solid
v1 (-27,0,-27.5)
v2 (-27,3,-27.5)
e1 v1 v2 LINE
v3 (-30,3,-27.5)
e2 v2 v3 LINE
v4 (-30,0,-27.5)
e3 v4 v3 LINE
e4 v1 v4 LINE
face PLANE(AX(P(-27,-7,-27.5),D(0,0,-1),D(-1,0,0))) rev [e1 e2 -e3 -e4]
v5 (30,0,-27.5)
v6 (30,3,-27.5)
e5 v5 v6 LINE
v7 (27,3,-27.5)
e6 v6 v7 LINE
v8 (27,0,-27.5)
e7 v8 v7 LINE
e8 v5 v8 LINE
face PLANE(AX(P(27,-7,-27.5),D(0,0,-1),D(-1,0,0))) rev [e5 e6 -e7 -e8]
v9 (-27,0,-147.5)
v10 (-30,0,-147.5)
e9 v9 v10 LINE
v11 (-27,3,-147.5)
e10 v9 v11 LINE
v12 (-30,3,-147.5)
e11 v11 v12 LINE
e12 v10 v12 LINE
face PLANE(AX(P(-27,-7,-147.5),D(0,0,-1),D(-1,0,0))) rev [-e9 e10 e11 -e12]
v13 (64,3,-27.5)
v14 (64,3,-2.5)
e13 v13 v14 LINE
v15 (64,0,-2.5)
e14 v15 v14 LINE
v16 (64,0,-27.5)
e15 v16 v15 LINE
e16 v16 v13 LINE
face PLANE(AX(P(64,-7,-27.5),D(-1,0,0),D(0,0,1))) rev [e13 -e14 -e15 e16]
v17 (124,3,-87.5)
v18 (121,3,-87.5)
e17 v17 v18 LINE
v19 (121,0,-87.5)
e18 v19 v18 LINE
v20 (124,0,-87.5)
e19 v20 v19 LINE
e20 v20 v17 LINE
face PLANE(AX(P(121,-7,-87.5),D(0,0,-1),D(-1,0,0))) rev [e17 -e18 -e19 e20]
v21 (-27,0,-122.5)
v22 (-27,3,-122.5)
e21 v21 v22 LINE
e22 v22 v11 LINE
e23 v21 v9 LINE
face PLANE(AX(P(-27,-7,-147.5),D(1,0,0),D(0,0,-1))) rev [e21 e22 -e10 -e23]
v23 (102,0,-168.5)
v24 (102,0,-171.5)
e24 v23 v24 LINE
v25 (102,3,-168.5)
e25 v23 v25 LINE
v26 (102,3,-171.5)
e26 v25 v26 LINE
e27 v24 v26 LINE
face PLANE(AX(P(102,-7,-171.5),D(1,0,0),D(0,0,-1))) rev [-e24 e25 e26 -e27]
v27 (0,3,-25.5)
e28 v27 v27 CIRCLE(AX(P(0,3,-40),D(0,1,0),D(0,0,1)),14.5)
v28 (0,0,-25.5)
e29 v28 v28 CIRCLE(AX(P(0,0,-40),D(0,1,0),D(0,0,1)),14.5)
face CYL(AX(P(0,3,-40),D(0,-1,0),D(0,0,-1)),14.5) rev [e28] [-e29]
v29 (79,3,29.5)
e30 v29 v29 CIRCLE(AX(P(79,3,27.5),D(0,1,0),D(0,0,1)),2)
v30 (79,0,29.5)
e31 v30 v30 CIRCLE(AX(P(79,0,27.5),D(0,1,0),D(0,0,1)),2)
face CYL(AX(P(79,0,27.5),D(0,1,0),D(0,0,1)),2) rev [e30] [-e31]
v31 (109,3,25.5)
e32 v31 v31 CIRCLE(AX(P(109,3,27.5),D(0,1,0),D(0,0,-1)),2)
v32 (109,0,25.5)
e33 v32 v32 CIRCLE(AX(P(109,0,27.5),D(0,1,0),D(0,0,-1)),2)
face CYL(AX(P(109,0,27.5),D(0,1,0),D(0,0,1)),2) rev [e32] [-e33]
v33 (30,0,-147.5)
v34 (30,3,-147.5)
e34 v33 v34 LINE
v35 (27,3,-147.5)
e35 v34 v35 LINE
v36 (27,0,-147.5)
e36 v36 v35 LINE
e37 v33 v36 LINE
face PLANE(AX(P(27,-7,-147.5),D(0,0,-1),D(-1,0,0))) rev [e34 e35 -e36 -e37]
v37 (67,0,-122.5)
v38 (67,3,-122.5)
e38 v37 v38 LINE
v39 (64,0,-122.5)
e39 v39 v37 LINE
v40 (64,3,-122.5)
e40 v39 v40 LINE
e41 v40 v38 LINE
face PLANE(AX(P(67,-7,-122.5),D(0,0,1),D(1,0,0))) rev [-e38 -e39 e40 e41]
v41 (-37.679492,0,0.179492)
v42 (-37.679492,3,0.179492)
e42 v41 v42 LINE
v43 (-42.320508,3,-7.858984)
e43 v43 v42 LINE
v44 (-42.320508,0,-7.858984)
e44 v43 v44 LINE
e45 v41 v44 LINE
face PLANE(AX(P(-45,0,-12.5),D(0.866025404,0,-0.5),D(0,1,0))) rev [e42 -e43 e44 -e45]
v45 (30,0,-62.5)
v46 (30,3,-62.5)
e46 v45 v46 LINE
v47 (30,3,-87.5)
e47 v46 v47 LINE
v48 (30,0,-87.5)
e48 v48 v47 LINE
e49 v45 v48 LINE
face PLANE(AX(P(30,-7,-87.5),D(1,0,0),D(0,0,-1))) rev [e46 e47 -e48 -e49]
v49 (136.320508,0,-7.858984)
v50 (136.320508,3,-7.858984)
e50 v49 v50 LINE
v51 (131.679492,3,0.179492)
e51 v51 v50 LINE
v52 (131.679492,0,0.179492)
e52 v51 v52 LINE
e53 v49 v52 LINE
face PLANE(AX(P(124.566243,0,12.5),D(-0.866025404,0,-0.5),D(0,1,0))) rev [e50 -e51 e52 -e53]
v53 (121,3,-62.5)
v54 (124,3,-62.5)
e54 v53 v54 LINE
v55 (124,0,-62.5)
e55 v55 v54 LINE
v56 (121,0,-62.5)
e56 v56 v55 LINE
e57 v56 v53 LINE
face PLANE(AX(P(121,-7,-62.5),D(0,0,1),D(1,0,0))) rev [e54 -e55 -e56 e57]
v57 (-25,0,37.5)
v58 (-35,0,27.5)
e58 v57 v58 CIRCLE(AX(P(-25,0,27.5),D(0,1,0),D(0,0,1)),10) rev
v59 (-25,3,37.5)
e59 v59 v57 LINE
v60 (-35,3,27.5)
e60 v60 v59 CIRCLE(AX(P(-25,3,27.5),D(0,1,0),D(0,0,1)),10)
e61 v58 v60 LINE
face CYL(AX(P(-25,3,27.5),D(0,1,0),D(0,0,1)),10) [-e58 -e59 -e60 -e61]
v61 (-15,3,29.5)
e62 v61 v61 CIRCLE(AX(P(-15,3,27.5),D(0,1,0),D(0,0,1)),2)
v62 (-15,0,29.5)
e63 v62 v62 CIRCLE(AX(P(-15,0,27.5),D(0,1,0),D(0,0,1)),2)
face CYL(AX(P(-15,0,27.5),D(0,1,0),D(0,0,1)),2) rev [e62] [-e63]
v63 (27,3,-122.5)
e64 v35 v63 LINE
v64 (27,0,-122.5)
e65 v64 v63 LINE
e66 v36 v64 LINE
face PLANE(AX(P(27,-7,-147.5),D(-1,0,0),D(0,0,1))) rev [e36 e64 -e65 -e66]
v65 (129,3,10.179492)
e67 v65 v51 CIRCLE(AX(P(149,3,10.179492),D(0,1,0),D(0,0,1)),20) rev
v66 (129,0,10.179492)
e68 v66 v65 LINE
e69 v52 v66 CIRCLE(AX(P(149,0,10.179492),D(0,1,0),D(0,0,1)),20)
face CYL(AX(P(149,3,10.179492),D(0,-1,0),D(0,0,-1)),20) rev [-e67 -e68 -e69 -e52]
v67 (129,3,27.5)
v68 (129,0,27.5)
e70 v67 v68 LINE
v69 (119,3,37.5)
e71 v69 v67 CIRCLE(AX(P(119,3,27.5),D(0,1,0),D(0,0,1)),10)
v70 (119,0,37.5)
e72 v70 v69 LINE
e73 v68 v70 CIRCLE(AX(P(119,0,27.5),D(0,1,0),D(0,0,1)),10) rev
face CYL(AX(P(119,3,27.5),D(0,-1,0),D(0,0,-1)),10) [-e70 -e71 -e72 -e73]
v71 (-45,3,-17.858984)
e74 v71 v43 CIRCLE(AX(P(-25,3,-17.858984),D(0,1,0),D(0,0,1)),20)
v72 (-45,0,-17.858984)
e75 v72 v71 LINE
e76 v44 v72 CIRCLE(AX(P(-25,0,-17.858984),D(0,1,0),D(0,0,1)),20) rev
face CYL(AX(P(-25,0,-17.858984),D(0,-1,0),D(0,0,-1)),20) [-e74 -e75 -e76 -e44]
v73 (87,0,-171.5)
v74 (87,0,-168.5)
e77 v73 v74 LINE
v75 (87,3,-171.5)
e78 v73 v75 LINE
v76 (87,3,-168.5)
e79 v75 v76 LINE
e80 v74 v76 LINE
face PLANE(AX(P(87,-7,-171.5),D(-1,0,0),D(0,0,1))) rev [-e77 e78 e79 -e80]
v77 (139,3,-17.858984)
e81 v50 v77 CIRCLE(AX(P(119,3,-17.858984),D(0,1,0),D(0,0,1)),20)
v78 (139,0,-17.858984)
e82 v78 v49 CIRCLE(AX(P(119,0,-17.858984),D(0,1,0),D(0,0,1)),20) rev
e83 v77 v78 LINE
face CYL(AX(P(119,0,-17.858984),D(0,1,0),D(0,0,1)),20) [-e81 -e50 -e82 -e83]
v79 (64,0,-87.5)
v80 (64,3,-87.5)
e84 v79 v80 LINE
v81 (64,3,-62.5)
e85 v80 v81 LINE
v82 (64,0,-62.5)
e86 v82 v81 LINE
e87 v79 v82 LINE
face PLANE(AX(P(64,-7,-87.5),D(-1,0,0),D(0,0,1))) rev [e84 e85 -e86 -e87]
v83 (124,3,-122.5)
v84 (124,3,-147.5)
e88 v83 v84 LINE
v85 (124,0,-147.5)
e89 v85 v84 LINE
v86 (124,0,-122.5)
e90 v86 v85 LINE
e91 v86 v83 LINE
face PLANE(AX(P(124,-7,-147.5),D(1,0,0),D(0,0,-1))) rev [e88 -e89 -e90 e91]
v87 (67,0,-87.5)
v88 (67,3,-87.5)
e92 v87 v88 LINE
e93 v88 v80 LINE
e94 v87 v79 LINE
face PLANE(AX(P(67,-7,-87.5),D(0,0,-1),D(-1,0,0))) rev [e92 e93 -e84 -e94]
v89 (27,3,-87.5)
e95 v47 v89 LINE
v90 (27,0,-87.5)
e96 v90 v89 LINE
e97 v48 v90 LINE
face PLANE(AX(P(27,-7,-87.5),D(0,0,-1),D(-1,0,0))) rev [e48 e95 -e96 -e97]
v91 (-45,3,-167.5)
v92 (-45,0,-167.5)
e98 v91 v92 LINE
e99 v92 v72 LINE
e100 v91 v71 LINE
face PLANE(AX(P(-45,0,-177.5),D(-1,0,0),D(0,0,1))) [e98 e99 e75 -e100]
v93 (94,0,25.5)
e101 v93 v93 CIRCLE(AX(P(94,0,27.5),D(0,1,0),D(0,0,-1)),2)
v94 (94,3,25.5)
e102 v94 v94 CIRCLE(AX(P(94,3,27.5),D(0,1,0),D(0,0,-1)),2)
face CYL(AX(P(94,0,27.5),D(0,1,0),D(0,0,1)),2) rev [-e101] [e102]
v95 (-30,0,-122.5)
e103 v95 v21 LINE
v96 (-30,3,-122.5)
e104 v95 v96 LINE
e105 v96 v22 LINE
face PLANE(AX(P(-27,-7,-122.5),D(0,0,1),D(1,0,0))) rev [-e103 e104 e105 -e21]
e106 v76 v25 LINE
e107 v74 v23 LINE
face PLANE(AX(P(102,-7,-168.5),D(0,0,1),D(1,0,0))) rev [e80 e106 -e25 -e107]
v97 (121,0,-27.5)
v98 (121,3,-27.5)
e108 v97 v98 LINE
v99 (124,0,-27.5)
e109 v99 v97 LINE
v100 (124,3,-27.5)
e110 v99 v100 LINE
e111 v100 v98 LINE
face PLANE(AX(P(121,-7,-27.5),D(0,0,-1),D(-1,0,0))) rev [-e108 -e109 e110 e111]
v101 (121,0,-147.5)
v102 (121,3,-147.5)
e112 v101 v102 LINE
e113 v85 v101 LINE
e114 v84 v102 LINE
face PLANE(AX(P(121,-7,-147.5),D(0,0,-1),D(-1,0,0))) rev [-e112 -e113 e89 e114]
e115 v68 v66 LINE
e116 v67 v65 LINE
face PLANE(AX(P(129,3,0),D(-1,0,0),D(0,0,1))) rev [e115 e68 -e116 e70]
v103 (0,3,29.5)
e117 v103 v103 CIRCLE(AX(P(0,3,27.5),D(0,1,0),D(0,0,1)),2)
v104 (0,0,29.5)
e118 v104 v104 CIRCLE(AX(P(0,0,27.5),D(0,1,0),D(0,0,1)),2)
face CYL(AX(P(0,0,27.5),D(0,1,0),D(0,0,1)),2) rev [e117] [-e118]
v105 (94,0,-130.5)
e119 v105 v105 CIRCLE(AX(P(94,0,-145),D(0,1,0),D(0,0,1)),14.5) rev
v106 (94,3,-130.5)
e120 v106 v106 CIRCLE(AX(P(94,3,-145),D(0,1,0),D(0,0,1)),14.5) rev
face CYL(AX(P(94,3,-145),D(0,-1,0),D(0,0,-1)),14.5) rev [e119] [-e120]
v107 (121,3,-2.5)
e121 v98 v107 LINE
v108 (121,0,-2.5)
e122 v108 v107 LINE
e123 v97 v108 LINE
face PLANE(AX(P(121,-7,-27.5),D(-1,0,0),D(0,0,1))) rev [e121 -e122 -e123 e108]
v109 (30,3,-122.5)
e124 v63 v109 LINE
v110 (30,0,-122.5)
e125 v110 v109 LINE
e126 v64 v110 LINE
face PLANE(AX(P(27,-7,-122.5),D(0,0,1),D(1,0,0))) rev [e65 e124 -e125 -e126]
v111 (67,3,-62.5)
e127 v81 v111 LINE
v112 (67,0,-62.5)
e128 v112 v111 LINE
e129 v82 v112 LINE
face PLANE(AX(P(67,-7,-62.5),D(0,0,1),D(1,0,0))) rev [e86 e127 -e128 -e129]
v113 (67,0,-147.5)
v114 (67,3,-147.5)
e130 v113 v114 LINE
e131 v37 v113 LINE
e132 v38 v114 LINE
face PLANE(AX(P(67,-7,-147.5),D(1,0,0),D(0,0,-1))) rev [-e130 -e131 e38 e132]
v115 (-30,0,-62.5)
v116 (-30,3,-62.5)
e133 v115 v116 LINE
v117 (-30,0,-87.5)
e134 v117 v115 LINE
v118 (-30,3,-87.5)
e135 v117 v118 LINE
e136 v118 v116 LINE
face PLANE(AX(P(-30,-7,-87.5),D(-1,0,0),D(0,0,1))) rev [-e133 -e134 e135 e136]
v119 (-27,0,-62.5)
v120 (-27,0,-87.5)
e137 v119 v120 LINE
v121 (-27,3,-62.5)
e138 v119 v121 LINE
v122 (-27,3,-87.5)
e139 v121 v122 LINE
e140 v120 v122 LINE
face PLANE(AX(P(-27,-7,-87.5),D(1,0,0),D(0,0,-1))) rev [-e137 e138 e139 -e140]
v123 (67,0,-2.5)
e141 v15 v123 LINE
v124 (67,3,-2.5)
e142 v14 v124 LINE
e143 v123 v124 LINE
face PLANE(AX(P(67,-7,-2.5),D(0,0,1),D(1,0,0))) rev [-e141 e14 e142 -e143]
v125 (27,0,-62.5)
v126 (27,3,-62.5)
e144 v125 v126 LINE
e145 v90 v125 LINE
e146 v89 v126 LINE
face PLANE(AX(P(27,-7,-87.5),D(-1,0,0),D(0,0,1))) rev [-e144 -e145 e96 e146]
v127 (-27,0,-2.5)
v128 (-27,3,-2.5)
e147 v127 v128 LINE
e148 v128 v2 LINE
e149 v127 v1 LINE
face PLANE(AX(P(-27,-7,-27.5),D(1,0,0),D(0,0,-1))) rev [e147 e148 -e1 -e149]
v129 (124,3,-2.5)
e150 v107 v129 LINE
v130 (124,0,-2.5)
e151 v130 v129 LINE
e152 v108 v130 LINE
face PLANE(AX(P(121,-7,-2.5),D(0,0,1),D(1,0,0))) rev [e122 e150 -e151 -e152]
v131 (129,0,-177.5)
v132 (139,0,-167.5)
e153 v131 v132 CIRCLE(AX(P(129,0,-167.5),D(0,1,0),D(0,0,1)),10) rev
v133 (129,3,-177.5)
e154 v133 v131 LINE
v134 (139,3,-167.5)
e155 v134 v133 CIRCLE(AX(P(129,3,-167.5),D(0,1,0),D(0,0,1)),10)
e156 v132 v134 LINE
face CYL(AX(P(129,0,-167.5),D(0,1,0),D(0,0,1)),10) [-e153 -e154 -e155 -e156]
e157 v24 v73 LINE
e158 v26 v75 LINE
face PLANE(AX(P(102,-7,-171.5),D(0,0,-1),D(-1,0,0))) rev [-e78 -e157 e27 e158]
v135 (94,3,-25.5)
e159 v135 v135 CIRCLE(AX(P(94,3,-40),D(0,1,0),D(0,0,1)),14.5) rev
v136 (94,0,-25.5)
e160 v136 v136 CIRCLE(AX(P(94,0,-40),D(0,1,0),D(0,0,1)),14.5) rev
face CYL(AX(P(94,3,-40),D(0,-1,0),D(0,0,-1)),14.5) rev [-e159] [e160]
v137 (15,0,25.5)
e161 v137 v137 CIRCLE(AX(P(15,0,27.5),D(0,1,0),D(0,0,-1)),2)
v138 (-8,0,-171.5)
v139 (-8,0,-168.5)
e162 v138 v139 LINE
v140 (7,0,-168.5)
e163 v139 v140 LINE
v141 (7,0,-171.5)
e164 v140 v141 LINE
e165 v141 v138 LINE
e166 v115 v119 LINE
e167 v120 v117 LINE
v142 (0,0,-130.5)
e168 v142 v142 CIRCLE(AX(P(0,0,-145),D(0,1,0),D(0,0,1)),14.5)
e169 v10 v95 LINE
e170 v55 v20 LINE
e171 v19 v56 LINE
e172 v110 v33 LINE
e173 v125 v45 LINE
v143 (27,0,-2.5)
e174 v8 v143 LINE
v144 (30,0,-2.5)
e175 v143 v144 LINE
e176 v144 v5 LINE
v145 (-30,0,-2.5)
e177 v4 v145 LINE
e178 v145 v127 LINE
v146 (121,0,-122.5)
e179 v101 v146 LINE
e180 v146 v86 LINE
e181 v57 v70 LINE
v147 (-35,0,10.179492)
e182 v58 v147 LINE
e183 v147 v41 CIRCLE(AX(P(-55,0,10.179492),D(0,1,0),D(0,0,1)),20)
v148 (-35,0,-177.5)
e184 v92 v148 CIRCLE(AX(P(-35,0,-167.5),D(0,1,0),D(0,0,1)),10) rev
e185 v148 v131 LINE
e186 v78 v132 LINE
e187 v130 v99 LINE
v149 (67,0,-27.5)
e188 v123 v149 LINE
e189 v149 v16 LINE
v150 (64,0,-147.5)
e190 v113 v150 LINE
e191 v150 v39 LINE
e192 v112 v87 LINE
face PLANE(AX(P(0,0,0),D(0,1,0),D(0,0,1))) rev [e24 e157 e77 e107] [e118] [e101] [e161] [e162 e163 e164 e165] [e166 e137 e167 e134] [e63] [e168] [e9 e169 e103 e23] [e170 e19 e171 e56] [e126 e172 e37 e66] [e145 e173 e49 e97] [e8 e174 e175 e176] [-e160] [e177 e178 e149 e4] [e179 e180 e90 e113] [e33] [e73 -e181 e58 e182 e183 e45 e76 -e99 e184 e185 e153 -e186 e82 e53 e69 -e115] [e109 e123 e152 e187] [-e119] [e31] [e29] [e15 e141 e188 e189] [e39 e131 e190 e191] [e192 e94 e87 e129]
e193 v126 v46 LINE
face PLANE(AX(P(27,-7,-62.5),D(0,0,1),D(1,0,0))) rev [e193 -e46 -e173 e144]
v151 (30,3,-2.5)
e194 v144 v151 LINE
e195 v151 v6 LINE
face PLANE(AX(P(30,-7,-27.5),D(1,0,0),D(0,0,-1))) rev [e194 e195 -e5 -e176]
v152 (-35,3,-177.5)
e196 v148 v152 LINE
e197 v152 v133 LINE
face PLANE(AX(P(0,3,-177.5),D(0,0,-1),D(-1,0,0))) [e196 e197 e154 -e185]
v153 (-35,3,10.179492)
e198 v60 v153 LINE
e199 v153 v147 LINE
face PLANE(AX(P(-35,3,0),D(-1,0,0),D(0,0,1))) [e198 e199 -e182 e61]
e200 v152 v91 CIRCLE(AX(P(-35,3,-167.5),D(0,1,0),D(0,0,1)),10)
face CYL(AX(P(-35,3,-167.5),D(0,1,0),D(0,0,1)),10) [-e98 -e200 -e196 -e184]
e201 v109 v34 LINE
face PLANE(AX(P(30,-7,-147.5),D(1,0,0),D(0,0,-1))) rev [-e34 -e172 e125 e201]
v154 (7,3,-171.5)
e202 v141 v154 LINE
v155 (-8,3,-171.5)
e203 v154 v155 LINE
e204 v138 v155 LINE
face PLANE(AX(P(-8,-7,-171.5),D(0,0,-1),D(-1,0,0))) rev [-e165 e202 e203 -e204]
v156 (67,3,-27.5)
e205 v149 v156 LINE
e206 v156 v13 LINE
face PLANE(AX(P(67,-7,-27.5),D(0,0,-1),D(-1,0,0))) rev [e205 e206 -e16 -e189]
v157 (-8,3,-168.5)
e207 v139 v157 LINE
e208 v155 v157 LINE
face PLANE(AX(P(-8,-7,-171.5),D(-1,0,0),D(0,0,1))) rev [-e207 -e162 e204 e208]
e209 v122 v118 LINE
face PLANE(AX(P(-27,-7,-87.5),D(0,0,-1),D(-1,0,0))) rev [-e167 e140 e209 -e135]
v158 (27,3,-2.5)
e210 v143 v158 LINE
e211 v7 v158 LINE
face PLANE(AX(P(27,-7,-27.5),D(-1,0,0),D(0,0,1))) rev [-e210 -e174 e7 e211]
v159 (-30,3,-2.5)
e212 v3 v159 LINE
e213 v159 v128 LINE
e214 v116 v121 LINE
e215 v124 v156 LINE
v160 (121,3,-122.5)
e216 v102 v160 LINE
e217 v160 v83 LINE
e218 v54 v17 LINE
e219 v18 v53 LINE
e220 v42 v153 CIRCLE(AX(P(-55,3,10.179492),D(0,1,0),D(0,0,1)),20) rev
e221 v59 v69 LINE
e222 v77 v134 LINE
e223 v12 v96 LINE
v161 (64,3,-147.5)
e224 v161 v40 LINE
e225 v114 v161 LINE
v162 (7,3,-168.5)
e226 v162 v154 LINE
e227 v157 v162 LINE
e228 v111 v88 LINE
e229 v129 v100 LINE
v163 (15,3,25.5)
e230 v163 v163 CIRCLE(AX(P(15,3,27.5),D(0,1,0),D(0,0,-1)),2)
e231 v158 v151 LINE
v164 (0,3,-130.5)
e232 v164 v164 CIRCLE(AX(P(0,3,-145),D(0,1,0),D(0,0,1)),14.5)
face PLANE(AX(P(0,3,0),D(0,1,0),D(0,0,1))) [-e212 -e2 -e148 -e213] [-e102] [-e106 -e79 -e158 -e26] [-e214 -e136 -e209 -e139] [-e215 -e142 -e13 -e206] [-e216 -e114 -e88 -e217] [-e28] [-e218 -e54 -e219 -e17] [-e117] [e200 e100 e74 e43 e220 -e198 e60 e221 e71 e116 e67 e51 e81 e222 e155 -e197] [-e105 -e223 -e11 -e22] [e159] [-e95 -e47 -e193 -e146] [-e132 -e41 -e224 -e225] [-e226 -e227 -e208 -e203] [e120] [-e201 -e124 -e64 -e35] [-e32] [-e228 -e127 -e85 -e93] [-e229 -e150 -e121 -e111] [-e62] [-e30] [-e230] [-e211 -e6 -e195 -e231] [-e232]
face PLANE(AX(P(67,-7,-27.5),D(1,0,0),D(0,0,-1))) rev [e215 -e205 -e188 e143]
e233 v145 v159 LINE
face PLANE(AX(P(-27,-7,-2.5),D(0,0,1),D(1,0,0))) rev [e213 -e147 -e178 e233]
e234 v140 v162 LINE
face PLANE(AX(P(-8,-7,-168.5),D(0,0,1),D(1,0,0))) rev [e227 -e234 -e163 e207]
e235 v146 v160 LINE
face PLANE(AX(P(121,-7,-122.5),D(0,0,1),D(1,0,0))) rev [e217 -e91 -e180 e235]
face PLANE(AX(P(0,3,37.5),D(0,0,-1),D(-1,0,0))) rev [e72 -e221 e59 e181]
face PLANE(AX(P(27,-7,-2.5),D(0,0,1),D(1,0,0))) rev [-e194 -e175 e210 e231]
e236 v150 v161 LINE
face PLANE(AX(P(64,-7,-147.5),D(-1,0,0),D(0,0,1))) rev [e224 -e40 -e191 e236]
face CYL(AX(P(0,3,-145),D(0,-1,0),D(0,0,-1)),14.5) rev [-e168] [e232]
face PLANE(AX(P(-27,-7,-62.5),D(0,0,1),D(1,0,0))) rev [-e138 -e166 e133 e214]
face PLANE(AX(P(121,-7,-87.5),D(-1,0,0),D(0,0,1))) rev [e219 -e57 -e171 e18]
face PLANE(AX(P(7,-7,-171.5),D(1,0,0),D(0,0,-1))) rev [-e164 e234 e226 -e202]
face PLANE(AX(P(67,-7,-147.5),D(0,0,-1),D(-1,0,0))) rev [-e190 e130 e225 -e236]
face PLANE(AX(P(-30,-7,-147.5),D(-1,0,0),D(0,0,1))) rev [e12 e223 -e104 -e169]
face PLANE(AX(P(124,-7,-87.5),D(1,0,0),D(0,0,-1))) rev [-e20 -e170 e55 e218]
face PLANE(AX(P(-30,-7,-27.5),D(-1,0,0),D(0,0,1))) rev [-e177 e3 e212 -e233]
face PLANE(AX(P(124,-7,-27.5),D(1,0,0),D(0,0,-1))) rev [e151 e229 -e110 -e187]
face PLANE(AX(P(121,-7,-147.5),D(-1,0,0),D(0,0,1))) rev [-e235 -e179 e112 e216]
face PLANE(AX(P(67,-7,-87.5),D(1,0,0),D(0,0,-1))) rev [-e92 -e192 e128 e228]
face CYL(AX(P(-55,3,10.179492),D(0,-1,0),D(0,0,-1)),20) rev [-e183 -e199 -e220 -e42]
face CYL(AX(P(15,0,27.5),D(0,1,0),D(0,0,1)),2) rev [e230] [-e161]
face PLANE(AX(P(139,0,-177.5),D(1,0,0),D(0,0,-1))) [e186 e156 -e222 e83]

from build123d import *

# Parameters (mm, degrees)
SKETCH_1_W          = 164
SKETCH_1_H          = 215
SKETCH_1_R          = 14.5
EXTRUDE_1_DEPTH     = 3
SKETCH_2_R          = 2
CUT_EXTRUDE_1_DEPTH = 3
SKETCH_3_W          = 3
SKETCH_3_H          = 25
CUT_EXTRUDE_2_DEPTH = 10
SKETCH_4_W          = 15
SKETCH_4_H          = 3
CUT_EXTRUDE_3_DEPTH = 10
SKETCH_6_W          = 10
SKETCH_6_H          = 190
EXTRUDE_2_DEPTH     = 3
CHAMFER_1_SIZE      = 25
CHAMFER_1_SIZE_2    = 14.43375673
FILLET_3_R          = 20
FILLET_4_R          = 10


with BuildPart() as part:
    # 草图1 → 凸台-拉伸1 (new body)
    with BuildSketch(Plane(origin=(0, 0, 0), x_dir=(1, 0, 0), z_dir=(0, 1, 0))):
        with Locations((47, 70)):
            Rectangle(SKETCH_1_W, SKETCH_1_H)
        with Locations(Location((94, 40, 0), (0, 0, 270))):
            Circle(SKETCH_1_R, mode=Mode.SUBTRACT)
        with Locations(Location((0, 40, 0), (0, 0, 270))):
            Circle(SKETCH_1_R, mode=Mode.SUBTRACT)
        with Locations(Location((0, 145, 0), (0, 0, 270))):
            Circle(SKETCH_1_R, mode=Mode.SUBTRACT)
        with Locations(Location((94, 145, 0), (0, 0, 270))):
            Circle(SKETCH_1_R, mode=Mode.SUBTRACT)
    extrude(amount=EXTRUDE_1_DEPTH)

    # 草图2 → 切除-拉伸1 (cut)
    with BuildSketch(Plane(origin=(0, 3, 0), x_dir=(1, 0, 0), z_dir=(0, 1, 0))):
        with Locations(Location((0, -27.5, 0), (0, 0, 270))):
            Circle(SKETCH_2_R)
        with Locations(Location((-15, -27.5, 0), (0, 0, 270))):
            Circle(SKETCH_2_R)
        with Locations(Location((15, -27.5, 0), (0, 0, 90))):
            Circle(SKETCH_2_R)
        with Locations(Location((79, -27.5, 0), (0, 0, 270))):
            Circle(SKETCH_2_R)
        with Locations(Location((109, -27.5, 0), (0, 0, 90))):
            Circle(SKETCH_2_R)
        with Locations(Location((94, -27.5, 0), (0, 0, 90))):
            Circle(SKETCH_2_R)
    extrude(amount=-CUT_EXTRUDE_1_DEPTH, mode=Mode.SUBTRACT)

    # 草图3 → 切除-拉伸2 (cut)
    with BuildSketch(Plane(origin=(0, 3, 0), x_dir=(1, 0, 0), z_dir=(0, 1, 0))):
        with Locations((28.5, 135)):
            Rectangle(SKETCH_3_W, SKETCH_3_H)
        with Locations((65.5, 135)):
            Rectangle(SKETCH_3_W, SKETCH_3_H)
        with Locations((28.5, 75)):
            Rectangle(SKETCH_3_W, SKETCH_3_H)
        with Locations((65.5, 75)):
            Rectangle(SKETCH_3_W, SKETCH_3_H)
        with Locations((28.5, 15)):
            Rectangle(SKETCH_3_W, SKETCH_3_H)
        with Locations((65.5, 15)):
            Rectangle(SKETCH_3_W, SKETCH_3_H)
        with Locations((-28.5, 15)):
            Rectangle(SKETCH_3_W, SKETCH_3_H)
        with Locations((-28.5, 75)):
            Rectangle(SKETCH_3_W, SKETCH_3_H)
        with Locations((-28.5, 135)):
            Rectangle(SKETCH_3_W, SKETCH_3_H)
        with Locations((122.5, 135)):
            Rectangle(SKETCH_3_W, SKETCH_3_H)
        with Locations((122.5, 75)):
            Rectangle(SKETCH_3_W, SKETCH_3_H)
        with Locations((122.5, 15)):
            Rectangle(SKETCH_3_W, SKETCH_3_H)
    extrude(amount=-CUT_EXTRUDE_2_DEPTH, mode=Mode.SUBTRACT)

    # 草图4 → 切除-拉伸3 (cut)
    with BuildSketch(Plane(origin=(0, 3, 0), x_dir=(1, 0, 0), z_dir=(0, 1, 0))):
        with Locations((-0.5, 170)):
            Rectangle(SKETCH_4_W, SKETCH_4_H)
        with Locations((94.5, 170)):
            Rectangle(SKETCH_4_W, SKETCH_4_H)
    extrude(amount=-CUT_EXTRUDE_3_DEPTH, mode=Mode.SUBTRACT)

    # 草图6 → 凸台-拉伸2 (add)
    with BuildSketch(Plane(origin=(0, 3, 0), x_dir=(1, 0, 0), z_dir=(0, 1, 0))):
        with Locations((-40, 82.5)):
            Rectangle(SKETCH_6_W, SKETCH_6_H)
        with Locations((134, 82.5)):
            Rectangle(SKETCH_6_W, SKETCH_6_H)
    extrude(amount=-EXTRUDE_2_DEPTH)

    # 倒角1
    # the kernel refuses this chamfer: 25, 14.43375673 mm, written as the material it takes off along each edge
    with BuildSketch(Plane(origin=(139, 67.677143866, 12.5), x_dir=(0.019326765612700705, 0, -0.9998132206222079), z_dir=(0, -1, 0))) as chamfer_1_piece_1_section:
        Polygon((CHAMFER_1_SIZE * 0.999813220622, -CHAMFER_1_SIZE * 0.0193267656127), (-CHAMFER_1_SIZE_2 * 0.0193267656124, -CHAMFER_1_SIZE_2 * 0.999813220604), (0, 0), align=None)
    chamfer_1_piece_1 = extrude(amount=132.354287732, mode=Mode.PRIVATE)
    chamfer_1_piece_1 = split(chamfer_1_piece_1, bisect_by=Plane(origin=(129, 1.5, 3.344472452), z_dir=(1, 0, 0)), keep=Keep.TOP, mode=Mode.PRIVATE)
    add(chamfer_1_piece_1, mode=Mode.SUBTRACT)
    with BuildSketch(Plane(origin=(-45, 67.677143866, 12.5), x_dir=(0.9983227437537926, 0, 0.057893862402670776), z_dir=(0, -1, 0))) as chamfer_1_piece_2_section:
        Polygon((CHAMFER_1_SIZE_2 * 0.998322743736, -CHAMFER_1_SIZE_2 * 0.0578938624016), (-CHAMFER_1_SIZE * 0.0578938624027, -CHAMFER_1_SIZE * 0.998322743754), (0, 0), align=None)
    chamfer_1_piece_2 = extrude(amount=132.354287732, mode=Mode.PRIVATE)
    chamfer_1_piece_2 = split(chamfer_1_piece_2, bisect_by=Plane(origin=(-35, 1.5, 3.344472452), z_dir=(-1, 0, 0)), keep=Keep.TOP, mode=Mode.PRIVATE)
    add(chamfer_1_piece_2, mode=Mode.SUBTRACT)

    # 圆角3
    fillet_3_edges = [part.edges().sort_by_distance(p)[0] for p in [
        (139, 1.5, -12.5),
        (-45, 1.5, -12.5),
        (129, 1.5, 4.820508076),
        (-35, 1.5, 4.820508076),
    ]]
    fillet(fillet_3_edges, radius=FILLET_3_R)

    # 圆角4
    fillet_4_edges = [part.edges().sort_by_distance(p)[0] for p in [
        (-35, 1.5, 37.5),
        (129, 1.5, 37.5),
        (-45, 1.5, -177.5),
        (139, 1.5, -177.5),
    ]]
    fillet(fillet_4_edges, radius=FILLET_4_R)


solid = part.part
